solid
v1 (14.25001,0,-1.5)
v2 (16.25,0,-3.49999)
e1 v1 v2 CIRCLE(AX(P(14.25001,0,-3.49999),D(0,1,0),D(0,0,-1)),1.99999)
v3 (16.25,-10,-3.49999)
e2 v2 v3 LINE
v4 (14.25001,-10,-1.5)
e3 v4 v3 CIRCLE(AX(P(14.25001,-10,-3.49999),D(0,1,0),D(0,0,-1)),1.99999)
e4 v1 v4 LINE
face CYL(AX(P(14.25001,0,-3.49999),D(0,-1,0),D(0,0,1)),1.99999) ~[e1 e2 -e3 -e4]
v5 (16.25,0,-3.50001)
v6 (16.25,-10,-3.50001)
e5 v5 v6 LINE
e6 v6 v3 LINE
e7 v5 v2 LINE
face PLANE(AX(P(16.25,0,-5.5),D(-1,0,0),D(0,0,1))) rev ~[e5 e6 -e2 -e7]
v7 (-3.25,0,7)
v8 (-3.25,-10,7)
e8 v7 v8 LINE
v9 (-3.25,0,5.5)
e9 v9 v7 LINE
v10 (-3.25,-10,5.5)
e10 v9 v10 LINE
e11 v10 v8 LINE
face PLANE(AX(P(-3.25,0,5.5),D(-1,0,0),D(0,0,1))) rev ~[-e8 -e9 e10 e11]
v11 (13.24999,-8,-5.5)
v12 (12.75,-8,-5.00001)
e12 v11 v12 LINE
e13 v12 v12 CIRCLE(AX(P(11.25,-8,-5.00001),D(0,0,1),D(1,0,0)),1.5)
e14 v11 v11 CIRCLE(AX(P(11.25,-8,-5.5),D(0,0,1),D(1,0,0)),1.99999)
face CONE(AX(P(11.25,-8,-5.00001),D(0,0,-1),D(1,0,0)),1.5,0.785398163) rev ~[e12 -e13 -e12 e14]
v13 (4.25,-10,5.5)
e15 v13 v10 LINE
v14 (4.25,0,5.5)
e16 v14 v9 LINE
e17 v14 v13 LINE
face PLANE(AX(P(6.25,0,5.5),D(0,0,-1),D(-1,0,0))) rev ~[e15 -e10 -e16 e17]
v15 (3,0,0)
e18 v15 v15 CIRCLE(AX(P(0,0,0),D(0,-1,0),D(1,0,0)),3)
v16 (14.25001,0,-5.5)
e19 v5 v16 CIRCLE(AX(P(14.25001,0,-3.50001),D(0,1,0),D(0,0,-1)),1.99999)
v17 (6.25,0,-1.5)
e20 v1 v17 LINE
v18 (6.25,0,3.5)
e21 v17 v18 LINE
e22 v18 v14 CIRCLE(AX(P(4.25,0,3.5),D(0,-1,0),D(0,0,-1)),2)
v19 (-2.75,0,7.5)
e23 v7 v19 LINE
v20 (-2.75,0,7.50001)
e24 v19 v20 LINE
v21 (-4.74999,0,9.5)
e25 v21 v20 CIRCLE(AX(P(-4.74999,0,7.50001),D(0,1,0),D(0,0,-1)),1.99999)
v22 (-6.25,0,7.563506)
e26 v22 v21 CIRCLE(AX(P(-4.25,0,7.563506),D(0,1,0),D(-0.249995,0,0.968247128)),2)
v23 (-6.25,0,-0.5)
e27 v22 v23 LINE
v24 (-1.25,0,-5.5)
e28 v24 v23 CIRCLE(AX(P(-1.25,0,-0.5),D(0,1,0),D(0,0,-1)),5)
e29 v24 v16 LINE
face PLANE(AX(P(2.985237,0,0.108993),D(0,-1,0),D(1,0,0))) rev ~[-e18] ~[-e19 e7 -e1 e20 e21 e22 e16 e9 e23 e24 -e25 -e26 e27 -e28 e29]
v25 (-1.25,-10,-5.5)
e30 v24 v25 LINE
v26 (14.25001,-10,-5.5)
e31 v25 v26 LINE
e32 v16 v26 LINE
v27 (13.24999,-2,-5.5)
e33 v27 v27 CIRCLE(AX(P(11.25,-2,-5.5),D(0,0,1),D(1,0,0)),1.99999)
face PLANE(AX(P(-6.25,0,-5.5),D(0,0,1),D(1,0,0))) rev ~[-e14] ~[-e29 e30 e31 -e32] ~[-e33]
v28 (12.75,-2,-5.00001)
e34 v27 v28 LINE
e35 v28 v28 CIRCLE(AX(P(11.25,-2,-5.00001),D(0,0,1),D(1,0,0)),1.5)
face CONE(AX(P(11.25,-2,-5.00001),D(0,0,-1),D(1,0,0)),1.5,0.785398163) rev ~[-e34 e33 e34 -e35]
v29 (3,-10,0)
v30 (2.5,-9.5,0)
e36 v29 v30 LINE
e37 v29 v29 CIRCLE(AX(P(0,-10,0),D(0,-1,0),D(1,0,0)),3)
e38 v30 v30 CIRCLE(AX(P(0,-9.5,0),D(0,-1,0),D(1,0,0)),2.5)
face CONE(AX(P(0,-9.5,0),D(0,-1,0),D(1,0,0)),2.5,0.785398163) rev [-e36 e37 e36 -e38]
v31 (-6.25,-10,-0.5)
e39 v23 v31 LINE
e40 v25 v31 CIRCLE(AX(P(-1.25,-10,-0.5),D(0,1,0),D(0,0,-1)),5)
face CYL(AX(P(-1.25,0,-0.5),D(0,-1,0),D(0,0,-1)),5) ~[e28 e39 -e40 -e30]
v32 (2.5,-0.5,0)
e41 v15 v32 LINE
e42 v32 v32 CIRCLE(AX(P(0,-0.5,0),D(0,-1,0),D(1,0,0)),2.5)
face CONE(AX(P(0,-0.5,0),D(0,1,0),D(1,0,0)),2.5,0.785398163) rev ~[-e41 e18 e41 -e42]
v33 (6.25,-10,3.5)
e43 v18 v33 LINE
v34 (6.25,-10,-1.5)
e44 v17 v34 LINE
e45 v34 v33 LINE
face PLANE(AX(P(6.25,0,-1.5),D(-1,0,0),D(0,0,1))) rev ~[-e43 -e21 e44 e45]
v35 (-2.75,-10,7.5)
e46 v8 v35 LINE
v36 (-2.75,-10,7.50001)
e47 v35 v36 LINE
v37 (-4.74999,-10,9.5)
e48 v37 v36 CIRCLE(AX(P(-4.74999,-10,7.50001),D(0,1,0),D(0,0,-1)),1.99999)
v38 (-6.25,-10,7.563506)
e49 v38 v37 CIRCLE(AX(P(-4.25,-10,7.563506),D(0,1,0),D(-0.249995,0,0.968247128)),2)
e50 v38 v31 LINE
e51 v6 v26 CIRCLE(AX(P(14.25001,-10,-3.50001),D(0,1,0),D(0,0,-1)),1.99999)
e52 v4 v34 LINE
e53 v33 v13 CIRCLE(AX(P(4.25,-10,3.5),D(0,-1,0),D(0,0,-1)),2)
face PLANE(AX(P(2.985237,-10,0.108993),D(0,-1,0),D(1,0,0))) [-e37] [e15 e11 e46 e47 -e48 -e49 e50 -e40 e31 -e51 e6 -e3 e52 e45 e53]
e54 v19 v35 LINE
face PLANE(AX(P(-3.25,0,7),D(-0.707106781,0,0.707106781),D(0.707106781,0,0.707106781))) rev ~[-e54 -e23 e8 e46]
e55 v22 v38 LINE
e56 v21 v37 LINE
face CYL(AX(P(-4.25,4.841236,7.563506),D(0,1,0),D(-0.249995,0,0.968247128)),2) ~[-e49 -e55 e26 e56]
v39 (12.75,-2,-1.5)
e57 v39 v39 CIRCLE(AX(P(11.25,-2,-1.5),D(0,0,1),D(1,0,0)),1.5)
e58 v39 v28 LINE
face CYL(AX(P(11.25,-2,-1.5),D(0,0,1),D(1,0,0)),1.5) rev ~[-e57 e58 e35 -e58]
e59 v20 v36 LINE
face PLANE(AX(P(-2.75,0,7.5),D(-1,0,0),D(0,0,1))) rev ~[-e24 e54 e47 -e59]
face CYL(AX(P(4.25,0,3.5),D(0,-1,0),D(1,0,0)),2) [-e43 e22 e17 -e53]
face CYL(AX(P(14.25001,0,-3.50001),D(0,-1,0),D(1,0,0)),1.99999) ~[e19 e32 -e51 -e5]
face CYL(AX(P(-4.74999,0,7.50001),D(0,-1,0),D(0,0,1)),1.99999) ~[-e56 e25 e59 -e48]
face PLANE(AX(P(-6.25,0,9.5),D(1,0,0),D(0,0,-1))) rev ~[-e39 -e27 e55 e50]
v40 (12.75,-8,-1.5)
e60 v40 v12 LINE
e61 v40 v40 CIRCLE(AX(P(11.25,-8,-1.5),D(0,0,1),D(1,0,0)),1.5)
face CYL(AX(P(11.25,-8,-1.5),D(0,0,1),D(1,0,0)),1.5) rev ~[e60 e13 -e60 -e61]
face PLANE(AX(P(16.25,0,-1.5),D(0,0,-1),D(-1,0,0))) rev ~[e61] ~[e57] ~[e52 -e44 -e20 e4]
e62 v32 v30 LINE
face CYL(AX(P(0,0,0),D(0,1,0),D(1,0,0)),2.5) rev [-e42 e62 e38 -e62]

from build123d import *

# Parameters (mm, degrees)
F0_R        = 2.5
F1_DEPTH    = 10
F2_R        = 1.5
F3_DEPTH    = 25
F4_R        = 1.99999
F5_T1_DEPTH = 19.6824712753
F6_R        = 5
F7_R        = 2
F8_R        = 1.99999
F9_SIZE     = 0.49999
F10_SIZE    = 0.5


# Not quite as in the source:
# - a fillet or chamfer that OpenCascade refuses, or shapes differently, is made with other operations: its cross-section is extruded or revolved along the edge and cut away or added
# - a fillet or chamfer is up to 0.001 mm smaller than in the source, because OpenCascade refuses the exact size


with BuildPart() as f1:
    # F0 (on Front) → F1 (new body)
    with BuildSketch(Plane.XZ):
        Polygon((-2.75, 9.5), (-6.25, 9.5), (-6.25, -5.5), (16.25, -5.5), (16.25, -1.5), (6.25, -1.5), (6.25, 5.5), (-3.25, 5.5), (-3.25, 7), (-2.75, 7.5), align=None)
        Circle(F0_R, mode=Mode.SUBTRACT)
    extrude(amount=F1_DEPTH)

    # F2 (on face) → F3 (cut)
    with BuildSketch(Plane.XY.offset(-1.5)):
        with Locations((11.25, -8)):
            Circle(F2_R)
        with Locations((11.25, -2)):
            Circle(F2_R)
    extrude(amount=-F3_DEPTH, mode=Mode.SUBTRACT)

    # F4 (radius 2 in the source; OpenCascade refuses exactly that, so slightly less here)
    f4_edges = [f1.edges().sort_by_distance(p)[0] for p in [
        (-2.75, -5, 9.5),
    ]]
    fillet(f4_edges, radius=F4_R)

    # F5: fillet of radius 2 on 1 edges, made by hand

    # F5_s2 → F5_t1 (cut)
    with BuildSketch(Plane.XZ.offset(-4.8412356377)):
        with BuildLine():
            ThreePointArc((-4.74999, 9.5), (-5.8311356678, 8.7882546988), (-6.25, 7.5635057449))
            Line((-6.25, 7.5635057449), (-6.25, 9.5))
            Line((-6.25, 9.5), (-4.74999, 9.5))
        make_face()
    extrude(amount=F5_T1_DEPTH, mode=Mode.SUBTRACT)

    # F6
    f6_edges = [f1.edges().sort_by_distance(p)[0] for p in [
        (-6.25, -5, -5.5),
    ]]
    fillet(f6_edges, radius=F6_R)

    # F7
    f7_edges = [f1.edges().sort_by_distance(p)[0] for p in [
        (6.25, -5, 5.5),
    ]]
    fillet(f7_edges, radius=F7_R)

    # F8 (radius 2 in the source; OpenCascade refuses exactly that, so slightly less here)
    f8_edges = [f1.edges().sort_by_distance(p)[0] for p in [
        (16.25, -5, -1.5),
        (16.25, -5, -5.5),
    ]]
    fillet(f8_edges, radius=F8_R)

    # F9 (size 0.5 in the source; OpenCascade refuses exactly that, so slightly less here)
    f9_edges = [f1.edges().sort_by_distance(p)[0] for p in [
        (9.75, -8, -5.5),
        (9.75, -2, -5.5),
    ]]
    chamfer(f9_edges, length=F9_SIZE)

    # F10
    f10_edges = [f1.edges().sort_by_distance(p)[0] for p in [
        (-2.5, -10, 0),
        (-2.5, 0, 0),
    ]]
    chamfer(f10_edges, length=F10_SIZE)


solid = f1.part
